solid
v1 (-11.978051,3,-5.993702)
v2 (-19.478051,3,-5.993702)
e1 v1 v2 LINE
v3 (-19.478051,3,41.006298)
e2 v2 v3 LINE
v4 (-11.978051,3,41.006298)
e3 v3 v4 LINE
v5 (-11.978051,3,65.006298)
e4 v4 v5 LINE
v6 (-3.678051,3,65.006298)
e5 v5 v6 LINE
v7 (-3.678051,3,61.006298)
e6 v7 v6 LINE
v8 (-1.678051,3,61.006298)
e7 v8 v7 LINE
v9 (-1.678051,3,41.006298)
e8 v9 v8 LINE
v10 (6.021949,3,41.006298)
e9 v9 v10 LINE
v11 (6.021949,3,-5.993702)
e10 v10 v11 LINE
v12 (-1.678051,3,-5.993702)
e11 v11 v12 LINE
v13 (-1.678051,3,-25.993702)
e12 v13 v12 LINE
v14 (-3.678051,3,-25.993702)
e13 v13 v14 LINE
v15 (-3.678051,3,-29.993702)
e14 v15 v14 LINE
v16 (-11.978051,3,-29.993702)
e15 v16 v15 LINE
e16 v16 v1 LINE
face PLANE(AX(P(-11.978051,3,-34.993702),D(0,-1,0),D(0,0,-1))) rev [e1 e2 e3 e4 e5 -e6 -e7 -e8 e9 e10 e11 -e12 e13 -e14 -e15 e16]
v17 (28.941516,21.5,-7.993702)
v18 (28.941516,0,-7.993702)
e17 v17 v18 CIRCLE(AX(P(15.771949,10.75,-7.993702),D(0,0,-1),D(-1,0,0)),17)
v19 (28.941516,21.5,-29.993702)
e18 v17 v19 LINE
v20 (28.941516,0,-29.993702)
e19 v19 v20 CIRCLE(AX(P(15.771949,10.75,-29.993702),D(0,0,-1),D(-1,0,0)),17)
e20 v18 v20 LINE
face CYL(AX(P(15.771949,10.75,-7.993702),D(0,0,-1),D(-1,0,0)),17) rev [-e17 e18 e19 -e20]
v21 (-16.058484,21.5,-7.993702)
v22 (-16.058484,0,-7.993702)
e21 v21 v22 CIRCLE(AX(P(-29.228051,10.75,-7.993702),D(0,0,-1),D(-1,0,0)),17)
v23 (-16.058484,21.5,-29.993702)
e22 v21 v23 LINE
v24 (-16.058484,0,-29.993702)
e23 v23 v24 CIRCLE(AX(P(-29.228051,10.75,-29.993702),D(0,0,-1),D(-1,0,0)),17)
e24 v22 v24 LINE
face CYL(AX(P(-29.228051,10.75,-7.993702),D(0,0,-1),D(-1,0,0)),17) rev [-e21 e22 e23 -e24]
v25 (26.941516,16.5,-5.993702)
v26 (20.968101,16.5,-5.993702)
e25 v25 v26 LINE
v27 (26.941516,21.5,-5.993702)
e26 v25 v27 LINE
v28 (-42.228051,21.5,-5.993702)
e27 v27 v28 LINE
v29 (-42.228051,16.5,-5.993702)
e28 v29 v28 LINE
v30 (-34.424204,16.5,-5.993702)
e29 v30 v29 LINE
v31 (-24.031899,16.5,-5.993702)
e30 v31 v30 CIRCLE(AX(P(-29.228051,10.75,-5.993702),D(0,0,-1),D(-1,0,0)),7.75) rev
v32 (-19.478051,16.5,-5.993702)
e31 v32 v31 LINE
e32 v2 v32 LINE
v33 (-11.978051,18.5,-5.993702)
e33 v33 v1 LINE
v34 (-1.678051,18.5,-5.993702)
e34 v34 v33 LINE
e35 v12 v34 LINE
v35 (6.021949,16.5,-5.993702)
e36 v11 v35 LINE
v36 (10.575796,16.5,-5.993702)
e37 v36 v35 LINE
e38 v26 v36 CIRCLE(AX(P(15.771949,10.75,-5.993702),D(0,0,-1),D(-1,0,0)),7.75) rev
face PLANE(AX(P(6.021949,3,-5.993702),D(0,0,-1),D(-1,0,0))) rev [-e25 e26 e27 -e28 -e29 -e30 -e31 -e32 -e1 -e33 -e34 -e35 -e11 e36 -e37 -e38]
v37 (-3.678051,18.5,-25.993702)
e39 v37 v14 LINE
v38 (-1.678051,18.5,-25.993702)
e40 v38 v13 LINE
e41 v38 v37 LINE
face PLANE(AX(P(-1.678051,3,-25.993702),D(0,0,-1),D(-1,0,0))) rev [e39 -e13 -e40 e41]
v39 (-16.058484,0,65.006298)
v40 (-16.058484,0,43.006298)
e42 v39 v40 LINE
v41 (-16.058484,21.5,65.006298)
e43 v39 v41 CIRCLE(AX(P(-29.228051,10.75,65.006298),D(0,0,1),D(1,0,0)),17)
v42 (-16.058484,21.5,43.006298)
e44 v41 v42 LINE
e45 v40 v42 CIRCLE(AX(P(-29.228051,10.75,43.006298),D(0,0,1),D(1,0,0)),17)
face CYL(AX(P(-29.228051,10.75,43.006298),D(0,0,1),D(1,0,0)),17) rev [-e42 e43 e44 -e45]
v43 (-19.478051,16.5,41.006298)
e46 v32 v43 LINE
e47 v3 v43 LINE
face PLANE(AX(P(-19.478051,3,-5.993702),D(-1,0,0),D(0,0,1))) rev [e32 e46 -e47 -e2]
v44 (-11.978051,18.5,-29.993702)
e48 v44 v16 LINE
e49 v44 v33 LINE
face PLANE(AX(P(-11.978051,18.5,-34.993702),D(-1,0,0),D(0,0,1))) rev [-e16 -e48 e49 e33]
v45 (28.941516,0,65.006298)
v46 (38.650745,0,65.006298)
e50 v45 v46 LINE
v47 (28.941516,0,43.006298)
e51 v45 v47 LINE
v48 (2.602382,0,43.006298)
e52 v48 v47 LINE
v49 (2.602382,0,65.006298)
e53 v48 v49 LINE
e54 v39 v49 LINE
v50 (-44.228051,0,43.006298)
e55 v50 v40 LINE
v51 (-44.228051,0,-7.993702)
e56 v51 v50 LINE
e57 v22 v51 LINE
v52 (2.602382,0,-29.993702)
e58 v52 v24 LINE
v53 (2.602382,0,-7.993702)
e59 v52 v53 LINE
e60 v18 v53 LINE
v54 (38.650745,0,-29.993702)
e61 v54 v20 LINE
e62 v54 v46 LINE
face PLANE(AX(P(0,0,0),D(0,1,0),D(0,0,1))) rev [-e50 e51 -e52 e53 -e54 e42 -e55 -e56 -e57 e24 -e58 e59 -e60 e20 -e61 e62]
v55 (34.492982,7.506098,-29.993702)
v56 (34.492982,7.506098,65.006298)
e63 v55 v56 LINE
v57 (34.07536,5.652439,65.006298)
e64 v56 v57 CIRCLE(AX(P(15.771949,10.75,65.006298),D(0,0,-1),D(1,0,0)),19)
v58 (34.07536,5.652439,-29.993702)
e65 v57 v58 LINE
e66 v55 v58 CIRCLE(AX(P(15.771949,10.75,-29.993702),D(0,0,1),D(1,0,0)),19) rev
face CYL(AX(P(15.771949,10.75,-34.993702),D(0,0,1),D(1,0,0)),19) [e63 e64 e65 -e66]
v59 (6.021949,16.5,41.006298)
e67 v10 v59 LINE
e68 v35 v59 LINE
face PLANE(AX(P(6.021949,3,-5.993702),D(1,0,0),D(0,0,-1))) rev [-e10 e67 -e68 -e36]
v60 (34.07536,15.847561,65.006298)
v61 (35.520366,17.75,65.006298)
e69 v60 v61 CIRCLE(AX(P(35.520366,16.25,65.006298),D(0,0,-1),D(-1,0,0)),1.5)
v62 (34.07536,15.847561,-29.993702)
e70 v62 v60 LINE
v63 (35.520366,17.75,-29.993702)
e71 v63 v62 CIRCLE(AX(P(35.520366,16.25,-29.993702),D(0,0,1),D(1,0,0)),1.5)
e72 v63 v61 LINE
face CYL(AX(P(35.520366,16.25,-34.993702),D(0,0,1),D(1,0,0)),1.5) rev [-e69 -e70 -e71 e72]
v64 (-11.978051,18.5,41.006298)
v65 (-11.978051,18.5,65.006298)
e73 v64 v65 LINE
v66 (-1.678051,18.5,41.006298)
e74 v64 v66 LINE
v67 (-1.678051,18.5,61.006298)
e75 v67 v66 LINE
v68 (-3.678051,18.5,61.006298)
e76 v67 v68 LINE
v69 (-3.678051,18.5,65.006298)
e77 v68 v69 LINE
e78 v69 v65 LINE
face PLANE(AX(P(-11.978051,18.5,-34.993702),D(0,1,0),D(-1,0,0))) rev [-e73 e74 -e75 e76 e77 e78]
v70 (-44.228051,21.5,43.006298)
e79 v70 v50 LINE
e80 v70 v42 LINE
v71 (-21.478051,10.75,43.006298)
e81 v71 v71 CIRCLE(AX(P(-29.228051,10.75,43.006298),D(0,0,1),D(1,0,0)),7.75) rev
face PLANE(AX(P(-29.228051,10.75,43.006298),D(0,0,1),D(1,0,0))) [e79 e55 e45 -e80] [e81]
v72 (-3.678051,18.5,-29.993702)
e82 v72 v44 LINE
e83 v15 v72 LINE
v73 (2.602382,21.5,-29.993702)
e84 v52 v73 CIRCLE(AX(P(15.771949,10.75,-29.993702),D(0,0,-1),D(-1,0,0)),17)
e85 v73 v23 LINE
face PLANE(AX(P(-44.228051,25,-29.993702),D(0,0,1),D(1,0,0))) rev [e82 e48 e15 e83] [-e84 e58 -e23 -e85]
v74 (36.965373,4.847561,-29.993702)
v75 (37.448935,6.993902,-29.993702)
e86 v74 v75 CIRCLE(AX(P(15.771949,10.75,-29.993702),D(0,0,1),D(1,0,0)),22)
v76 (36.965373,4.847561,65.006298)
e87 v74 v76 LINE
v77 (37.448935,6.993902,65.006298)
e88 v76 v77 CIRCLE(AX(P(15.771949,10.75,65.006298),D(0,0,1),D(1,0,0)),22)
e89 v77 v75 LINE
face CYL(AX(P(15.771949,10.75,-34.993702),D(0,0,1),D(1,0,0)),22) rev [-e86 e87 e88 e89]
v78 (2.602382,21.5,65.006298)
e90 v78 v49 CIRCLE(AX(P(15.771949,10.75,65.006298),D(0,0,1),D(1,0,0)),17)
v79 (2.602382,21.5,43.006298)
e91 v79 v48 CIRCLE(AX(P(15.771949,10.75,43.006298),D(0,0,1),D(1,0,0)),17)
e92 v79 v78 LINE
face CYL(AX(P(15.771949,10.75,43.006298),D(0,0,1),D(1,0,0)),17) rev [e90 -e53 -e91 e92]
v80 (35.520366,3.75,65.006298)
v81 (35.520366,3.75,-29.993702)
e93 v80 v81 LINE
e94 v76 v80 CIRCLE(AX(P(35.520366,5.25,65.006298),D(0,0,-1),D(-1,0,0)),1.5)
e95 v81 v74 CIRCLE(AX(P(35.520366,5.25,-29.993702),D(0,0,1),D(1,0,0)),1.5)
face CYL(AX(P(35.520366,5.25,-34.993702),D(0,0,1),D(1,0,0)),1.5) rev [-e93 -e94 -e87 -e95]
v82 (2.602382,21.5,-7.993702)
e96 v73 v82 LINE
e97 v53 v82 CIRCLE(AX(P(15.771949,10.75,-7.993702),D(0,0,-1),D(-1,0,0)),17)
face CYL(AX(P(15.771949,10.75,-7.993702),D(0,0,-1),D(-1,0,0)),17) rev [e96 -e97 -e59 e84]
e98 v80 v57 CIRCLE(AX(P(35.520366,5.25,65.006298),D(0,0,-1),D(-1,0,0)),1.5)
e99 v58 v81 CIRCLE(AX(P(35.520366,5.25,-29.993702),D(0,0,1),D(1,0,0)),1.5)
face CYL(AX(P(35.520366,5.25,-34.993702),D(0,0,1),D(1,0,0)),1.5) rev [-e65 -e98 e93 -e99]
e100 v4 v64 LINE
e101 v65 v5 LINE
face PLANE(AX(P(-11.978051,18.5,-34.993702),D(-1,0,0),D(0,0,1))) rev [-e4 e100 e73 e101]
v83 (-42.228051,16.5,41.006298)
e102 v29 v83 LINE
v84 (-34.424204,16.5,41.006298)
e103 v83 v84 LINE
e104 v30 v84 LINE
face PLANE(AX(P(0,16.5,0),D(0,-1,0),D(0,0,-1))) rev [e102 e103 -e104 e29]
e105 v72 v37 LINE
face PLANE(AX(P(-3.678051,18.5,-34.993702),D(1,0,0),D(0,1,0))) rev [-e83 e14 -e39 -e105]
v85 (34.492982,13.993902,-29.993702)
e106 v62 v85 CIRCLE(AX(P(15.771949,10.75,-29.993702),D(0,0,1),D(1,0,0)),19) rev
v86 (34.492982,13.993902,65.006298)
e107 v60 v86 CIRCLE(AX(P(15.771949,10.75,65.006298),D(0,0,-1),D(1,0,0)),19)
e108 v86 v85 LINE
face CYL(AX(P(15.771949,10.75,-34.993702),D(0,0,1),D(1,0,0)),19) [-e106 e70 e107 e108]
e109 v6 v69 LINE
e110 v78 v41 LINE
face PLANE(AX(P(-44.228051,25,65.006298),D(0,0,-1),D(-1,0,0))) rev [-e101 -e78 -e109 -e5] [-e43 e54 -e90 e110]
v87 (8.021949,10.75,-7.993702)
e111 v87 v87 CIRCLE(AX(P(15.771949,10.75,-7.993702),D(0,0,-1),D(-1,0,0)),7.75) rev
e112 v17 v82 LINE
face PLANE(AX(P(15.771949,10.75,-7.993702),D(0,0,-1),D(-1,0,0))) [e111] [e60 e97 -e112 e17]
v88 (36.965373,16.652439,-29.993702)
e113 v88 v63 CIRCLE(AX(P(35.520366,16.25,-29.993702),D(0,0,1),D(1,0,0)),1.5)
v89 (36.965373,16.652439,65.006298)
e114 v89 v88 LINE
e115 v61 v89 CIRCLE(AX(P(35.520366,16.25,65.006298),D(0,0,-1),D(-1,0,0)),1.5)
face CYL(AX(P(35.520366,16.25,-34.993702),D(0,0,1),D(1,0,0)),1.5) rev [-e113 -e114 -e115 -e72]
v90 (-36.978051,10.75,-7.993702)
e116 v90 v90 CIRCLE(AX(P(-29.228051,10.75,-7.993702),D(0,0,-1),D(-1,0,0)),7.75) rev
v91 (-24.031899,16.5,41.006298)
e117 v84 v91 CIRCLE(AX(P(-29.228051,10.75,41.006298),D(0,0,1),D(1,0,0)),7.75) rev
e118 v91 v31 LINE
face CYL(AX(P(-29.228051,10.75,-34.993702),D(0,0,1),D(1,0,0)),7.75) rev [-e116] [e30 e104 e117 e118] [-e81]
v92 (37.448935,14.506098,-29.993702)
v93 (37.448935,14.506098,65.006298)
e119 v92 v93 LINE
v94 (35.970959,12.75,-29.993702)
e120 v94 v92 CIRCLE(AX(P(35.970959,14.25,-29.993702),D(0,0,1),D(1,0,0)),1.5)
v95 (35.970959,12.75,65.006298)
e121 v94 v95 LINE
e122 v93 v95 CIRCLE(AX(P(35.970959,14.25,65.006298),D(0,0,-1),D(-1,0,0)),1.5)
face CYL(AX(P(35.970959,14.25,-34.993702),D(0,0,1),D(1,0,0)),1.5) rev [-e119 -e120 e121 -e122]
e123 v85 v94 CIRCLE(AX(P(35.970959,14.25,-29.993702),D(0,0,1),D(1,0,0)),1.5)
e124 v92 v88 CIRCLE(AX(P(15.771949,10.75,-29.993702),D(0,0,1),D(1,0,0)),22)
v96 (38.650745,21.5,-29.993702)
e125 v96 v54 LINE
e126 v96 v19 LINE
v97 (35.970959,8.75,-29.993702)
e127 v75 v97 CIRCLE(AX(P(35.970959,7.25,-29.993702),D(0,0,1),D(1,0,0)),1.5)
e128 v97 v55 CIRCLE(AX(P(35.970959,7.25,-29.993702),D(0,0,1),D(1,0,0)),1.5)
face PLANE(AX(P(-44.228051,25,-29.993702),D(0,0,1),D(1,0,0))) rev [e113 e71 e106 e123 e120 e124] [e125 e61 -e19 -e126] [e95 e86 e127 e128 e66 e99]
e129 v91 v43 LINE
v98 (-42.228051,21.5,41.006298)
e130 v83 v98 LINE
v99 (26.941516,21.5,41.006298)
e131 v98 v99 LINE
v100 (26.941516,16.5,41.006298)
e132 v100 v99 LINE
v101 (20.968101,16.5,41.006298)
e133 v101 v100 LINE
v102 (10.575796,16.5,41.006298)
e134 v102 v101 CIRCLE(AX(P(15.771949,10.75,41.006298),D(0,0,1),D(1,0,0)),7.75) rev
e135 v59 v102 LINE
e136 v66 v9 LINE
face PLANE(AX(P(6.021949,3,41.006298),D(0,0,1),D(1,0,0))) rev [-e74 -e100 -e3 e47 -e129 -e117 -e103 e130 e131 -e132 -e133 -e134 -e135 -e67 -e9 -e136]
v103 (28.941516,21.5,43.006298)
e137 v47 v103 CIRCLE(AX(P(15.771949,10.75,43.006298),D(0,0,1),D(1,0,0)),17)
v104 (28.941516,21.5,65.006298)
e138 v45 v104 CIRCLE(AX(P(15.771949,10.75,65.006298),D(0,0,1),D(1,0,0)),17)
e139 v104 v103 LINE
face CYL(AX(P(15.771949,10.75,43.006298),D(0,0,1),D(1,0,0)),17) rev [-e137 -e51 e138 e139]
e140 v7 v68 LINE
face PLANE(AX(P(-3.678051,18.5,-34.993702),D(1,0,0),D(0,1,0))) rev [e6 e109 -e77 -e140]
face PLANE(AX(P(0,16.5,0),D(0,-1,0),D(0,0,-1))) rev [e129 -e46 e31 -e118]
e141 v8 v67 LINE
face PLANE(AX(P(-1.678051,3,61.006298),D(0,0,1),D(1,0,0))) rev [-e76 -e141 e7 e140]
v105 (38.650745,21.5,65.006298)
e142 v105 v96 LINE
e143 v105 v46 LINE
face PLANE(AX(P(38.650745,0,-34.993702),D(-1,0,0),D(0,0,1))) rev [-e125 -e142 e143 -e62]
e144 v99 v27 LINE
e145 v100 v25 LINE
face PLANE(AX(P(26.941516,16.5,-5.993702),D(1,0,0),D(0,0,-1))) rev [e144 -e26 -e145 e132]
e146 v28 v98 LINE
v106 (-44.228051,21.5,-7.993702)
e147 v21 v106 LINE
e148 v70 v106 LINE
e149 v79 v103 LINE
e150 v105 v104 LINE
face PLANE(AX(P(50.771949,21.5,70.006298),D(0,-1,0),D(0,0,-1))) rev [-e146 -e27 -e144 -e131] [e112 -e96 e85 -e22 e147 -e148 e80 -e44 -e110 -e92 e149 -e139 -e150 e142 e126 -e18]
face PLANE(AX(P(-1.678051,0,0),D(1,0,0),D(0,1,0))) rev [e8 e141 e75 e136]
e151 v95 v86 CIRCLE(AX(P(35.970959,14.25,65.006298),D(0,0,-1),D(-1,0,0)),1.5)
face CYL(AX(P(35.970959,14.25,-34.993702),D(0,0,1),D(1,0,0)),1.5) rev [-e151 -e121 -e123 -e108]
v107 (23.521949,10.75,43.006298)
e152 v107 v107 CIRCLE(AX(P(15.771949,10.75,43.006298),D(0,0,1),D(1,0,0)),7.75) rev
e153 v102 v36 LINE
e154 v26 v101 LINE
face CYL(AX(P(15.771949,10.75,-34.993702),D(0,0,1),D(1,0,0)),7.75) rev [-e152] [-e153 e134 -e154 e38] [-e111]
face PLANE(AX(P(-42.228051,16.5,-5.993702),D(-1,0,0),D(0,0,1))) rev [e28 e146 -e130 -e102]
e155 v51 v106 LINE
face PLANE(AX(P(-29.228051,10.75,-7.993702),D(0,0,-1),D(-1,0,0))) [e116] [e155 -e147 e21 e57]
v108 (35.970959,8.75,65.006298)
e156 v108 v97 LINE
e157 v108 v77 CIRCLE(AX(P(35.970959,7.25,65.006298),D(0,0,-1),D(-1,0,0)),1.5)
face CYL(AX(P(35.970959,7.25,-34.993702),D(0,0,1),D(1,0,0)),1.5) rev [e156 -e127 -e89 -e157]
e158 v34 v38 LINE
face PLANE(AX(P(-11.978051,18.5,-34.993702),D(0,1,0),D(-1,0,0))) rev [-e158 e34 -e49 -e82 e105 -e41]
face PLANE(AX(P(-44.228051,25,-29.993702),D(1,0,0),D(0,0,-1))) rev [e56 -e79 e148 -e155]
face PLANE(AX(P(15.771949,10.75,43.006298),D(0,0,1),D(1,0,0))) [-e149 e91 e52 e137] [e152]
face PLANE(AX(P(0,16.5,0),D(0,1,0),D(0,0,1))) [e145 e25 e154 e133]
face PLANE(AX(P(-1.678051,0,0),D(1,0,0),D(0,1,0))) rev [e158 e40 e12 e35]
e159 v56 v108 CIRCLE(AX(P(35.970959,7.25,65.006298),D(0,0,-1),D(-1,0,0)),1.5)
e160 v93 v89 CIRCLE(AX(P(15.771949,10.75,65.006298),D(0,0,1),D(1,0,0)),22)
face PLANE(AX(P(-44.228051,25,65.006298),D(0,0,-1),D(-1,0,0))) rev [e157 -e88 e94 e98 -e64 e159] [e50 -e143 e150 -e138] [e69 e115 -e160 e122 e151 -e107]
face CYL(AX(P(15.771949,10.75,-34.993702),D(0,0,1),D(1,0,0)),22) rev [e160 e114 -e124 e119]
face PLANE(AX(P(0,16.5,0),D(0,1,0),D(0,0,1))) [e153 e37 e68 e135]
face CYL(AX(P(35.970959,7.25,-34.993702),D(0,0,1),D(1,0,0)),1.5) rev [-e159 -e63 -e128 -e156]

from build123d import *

# Parameters (mm, degrees)
SKETCH1_W           = 95
SKETCH1_H           = 95
BOSS_EXTRUDE1_DEPTH = 25
SKETCH2_R           = 7.75
CUT_EXTRUDE2_DEPTH  = 100
SKETCH3_R           = 17
CUT_EXTRUDE3_DEPTH  = 22
CUT_EXTRUDE4_START  = -22
SKETCH4_R           = 17
CUT_EXTRUDE4_DEPTH  = 22
SKETCH5_W           = 6.246993927
SKETCH5_H           = 25
CUT_EXTRUDE5_DEPTH  = 22
SKETCH6_W           = 7.178723585
SKETCH6_H           = 25
CUT_EXTRUDE6_DEPTH  = 22
SKETCH8_W           = 99.503929421
SKETCH8_H           = 3.5
CUT_EXTRUDE7_DEPTH  = 100
SKETCH9_W           = 8.3
SKETCH9_H           = 15.5
CUT_EXTRUDE11_DEPTH = 100
SKETCH13_W          = 87
SKETCH13_H          = 15.5
CUT_EXTRUDE12_DEPTH = 2
SKETCH14_W          = 25.5
SKETCH14_H          = 47
CUT_EXTRUDE14_DEPTH = 18.5
SKETCH16_W          = 24.75
SKETCH16_H          = 47
CUT_EXTRUDE15_DEPTH = 5
SKETCH17_W          = 20.919567191
SKETCH17_H          = 47
CUT_EXTRUDE16_DEPTH = 5
CUT_EXTRUDE17_DEPTH = 100
FILLET6_R           = 1.5
FILLET7_R           = 1.5
FILLET8_R           = 1.5
FILLET9_R           = 1.5
SKETCH19_W          = 12.12120401
SKETCH19_H          = 21.5
CUT_EXTRUDE20_DEPTH = 100


with BuildPart() as part:
    # Sketch1 → Boss-Extrude1 (new body)
    with BuildSketch(Plane(origin=(0, 0, 0), x_dir=(1, 0, 0), z_dir=(0, 1, 0))):
        with Locations((3.271948822, -17.506298191)):
            Rectangle(SKETCH1_W, SKETCH1_H)
    extrude(amount=BOSS_EXTRUDE1_DEPTH)

    # Sketch2 → Cut-Extrude2 (cut)
    with BuildSketch(Plane.XY.offset(65.006298191)):
        with Locations((-29.228051178, 10.75)):
            Circle(SKETCH2_R)
        with Locations((15.771948822, 10.75)):
            Circle(SKETCH2_R)
    extrude(amount=-CUT_EXTRUDE2_DEPTH, mode=Mode.SUBTRACT)

    # Sketch3 → Cut-Extrude3 (cut)
    with BuildSketch(Plane.XY.offset(65.006298191)):
        with Locations((-29.228051178, 10.75)):
            Circle(SKETCH3_R)
        with Locations((15.771948822, 10.75)):
            Circle(SKETCH3_R)
    extrude(amount=-CUT_EXTRUDE3_DEPTH, mode=Mode.SUBTRACT)

    # Sketch4 → Cut-Extrude4 (cut)
    with BuildSketch(Plane(origin=(0, 0, -29.993701809), x_dir=(-1, 0, 0), z_dir=(0, 0, -1)).offset(CUT_EXTRUDE4_START)):
        with Locations((-15.771948822, 10.75)):
            Circle(SKETCH4_R)
        with Locations((29.228051178, 10.75)):
            Circle(SKETCH4_R)
    extrude(amount=CUT_EXTRUDE4_DEPTH, mode=Mode.SUBTRACT)

    # Sketch5 → Cut-Extrude5 (cut)
    with BuildSketch(Plane.XY.offset(65.006298191)):
        with Locations((-41.104554214, 12.5)):
            Rectangle(SKETCH5_W, SKETCH5_H)
    extrude(amount=-CUT_EXTRUDE5_DEPTH, mode=Mode.SUBTRACT)

    # Sketch6 → Cut-Extrude6 (cut)
    with BuildSketch(Plane(origin=(0, 0, -29.993701809), x_dir=(-1, 0, 0), z_dir=(0, 0, -1))):
        with Locations((40.638689386, 12.5)):
            Rectangle(SKETCH6_W, SKETCH6_H)
    extrude(amount=-CUT_EXTRUDE6_DEPTH, mode=Mode.SUBTRACT)

    # Sketch8 → Cut-Extrude7 (cut)
    with BuildSketch(Plane(origin=(0, 0, -29.993701809), x_dir=(-1, 0, 0), z_dir=(0, 0, -1))):
        with Locations((-1.019984112, 23.25)):
            Rectangle(SKETCH8_W, SKETCH8_H)
    extrude(amount=-CUT_EXTRUDE7_DEPTH, mode=Mode.SUBTRACT)

    # Sketch9 → Cut-Extrude11 (cut)
    with BuildSketch(Plane.XY.offset(65.006298191)):
        with Locations((-7.828051178, 10.75)):
            Rectangle(SKETCH9_W, SKETCH9_H)
    extrude(amount=-CUT_EXTRUDE11_DEPTH, mode=Mode.SUBTRACT)

    # Sketch13 → Cut-Extrude12 (cut)
    with BuildSketch(Plane.ZY.offset(3.678051178)):
        with Locations((17.506298191, 10.75)):
            Rectangle(SKETCH13_W, SKETCH13_H)
    extrude(amount=-CUT_EXTRUDE12_DEPTH, mode=Mode.SUBTRACT)

    # Sketch14 → Cut-Extrude14 (cut)
    with BuildSketch(Plane(origin=(0, 21.5, 0), x_dir=(1, 0, 0), z_dir=(0, 1, 0))):
        with Locations((-6.728051178, -17.506298191)):
            Rectangle(SKETCH14_W, SKETCH14_H)
    extrude(amount=-CUT_EXTRUDE14_DEPTH, mode=Mode.SUBTRACT)

    # Sketch16 → Cut-Extrude15 (cut)
    with BuildSketch(Plane(origin=(0, 21.5, 0), x_dir=(1, 0, 0), z_dir=(0, 1, 0))):
        with Locations((-29.853051178, -17.506298191)):
            Rectangle(SKETCH16_W, SKETCH16_H)
    extrude(amount=-CUT_EXTRUDE15_DEPTH, mode=Mode.SUBTRACT)

    # Sketch17 → Cut-Extrude16 (cut)
    with BuildSketch(Plane(origin=(0, 21.5, 0), x_dir=(1, 0, 0), z_dir=(0, 1, 0))):
        with Locations((16.481732418, -17.506298191)):
            Rectangle(SKETCH17_W, SKETCH17_H)
    extrude(amount=-CUT_EXTRUDE16_DEPTH, mode=Mode.SUBTRACT)

    # Sketch18 → Cut-Extrude17 (cut)
    with BuildSketch(Plane.XY.offset(65.006298191)):
        with BuildLine():
            Line((34.66639245, 12.75), (37.680851122, 12.75))
            ThreePointArc((37.680851122, 12.75), (37.300376381, 15.28065192), (36.628602437, 17.75))
            Line((36.628602437, 17.75), (33.435470555, 17.75))
            ThreePointArc((33.435470555, 17.75), (34.221100776, 15.291893017), (34.66639245, 12.75))
        make_face()
        with BuildLine():
            Line((34.66639245, 8.75), (37.680851122, 8.75))
            ThreePointArc((37.680851122, 8.75), (37.300376381, 6.21934808), (36.628602437, 3.75))
            Line((36.628602437, 3.75), (33.435470555, 3.75))
            ThreePointArc((33.435470555, 3.75), (34.221100776, 6.208106983), (34.66639245, 8.75))
        make_face()
    extrude(amount=-CUT_EXTRUDE17_DEPTH, mode=Mode.SUBTRACT)

    # Fillet6
    fillet6_edges = [part.edges().sort_by_distance(p)[0] for p in [
        (33.435470555, 17.75, 17.506298191),
        (36.628602437, 17.75, 17.506298191),
    ]]
    fillet(fillet6_edges, radius=FILLET6_R - 0.0001)  # a hair under: the kernel refuses the full size

    # Fillet7
    fillet7_edges = [part.edges().sort_by_distance(p)[0] for p in [
        (37.680851122, 12.75, 17.506298191),
        (34.66639245, 12.75, 17.506298191),
    ]]
    fillet(fillet7_edges, radius=FILLET7_R - 0.0001)  # a hair under: the kernel refuses the full size

    # Fillet8
    fillet8_edges = [part.edges().sort_by_distance(p)[0] for p in [
        (33.435470555, 3.75, 17.506298191),
        (36.628602437, 3.75, 17.506298191),
    ]]
    fillet(fillet8_edges, radius=FILLET8_R - 0.0001)  # a hair under: the kernel refuses the full size

    # Fillet9
    fillet9_edges = [part.edges().sort_by_distance(p)[0] for p in [
        (37.680851122, 8.75, 17.506298191),
        (34.66639245, 8.75, 17.506298191),
    ]]
    fillet(fillet9_edges, radius=FILLET9_R - 0.0001)  # a hair under: the kernel refuses the full size

    # Sketch19 → Cut-Extrude20 (cut)
    with BuildSketch(Plane.XY.offset(65.006298191)):
        with Locations((44.711346817, 10.75)):
            Rectangle(SKETCH19_W, SKETCH19_H)
    extrude(amount=-CUT_EXTRUDE20_DEPTH, mode=Mode.SUBTRACT)


solid = part.part
